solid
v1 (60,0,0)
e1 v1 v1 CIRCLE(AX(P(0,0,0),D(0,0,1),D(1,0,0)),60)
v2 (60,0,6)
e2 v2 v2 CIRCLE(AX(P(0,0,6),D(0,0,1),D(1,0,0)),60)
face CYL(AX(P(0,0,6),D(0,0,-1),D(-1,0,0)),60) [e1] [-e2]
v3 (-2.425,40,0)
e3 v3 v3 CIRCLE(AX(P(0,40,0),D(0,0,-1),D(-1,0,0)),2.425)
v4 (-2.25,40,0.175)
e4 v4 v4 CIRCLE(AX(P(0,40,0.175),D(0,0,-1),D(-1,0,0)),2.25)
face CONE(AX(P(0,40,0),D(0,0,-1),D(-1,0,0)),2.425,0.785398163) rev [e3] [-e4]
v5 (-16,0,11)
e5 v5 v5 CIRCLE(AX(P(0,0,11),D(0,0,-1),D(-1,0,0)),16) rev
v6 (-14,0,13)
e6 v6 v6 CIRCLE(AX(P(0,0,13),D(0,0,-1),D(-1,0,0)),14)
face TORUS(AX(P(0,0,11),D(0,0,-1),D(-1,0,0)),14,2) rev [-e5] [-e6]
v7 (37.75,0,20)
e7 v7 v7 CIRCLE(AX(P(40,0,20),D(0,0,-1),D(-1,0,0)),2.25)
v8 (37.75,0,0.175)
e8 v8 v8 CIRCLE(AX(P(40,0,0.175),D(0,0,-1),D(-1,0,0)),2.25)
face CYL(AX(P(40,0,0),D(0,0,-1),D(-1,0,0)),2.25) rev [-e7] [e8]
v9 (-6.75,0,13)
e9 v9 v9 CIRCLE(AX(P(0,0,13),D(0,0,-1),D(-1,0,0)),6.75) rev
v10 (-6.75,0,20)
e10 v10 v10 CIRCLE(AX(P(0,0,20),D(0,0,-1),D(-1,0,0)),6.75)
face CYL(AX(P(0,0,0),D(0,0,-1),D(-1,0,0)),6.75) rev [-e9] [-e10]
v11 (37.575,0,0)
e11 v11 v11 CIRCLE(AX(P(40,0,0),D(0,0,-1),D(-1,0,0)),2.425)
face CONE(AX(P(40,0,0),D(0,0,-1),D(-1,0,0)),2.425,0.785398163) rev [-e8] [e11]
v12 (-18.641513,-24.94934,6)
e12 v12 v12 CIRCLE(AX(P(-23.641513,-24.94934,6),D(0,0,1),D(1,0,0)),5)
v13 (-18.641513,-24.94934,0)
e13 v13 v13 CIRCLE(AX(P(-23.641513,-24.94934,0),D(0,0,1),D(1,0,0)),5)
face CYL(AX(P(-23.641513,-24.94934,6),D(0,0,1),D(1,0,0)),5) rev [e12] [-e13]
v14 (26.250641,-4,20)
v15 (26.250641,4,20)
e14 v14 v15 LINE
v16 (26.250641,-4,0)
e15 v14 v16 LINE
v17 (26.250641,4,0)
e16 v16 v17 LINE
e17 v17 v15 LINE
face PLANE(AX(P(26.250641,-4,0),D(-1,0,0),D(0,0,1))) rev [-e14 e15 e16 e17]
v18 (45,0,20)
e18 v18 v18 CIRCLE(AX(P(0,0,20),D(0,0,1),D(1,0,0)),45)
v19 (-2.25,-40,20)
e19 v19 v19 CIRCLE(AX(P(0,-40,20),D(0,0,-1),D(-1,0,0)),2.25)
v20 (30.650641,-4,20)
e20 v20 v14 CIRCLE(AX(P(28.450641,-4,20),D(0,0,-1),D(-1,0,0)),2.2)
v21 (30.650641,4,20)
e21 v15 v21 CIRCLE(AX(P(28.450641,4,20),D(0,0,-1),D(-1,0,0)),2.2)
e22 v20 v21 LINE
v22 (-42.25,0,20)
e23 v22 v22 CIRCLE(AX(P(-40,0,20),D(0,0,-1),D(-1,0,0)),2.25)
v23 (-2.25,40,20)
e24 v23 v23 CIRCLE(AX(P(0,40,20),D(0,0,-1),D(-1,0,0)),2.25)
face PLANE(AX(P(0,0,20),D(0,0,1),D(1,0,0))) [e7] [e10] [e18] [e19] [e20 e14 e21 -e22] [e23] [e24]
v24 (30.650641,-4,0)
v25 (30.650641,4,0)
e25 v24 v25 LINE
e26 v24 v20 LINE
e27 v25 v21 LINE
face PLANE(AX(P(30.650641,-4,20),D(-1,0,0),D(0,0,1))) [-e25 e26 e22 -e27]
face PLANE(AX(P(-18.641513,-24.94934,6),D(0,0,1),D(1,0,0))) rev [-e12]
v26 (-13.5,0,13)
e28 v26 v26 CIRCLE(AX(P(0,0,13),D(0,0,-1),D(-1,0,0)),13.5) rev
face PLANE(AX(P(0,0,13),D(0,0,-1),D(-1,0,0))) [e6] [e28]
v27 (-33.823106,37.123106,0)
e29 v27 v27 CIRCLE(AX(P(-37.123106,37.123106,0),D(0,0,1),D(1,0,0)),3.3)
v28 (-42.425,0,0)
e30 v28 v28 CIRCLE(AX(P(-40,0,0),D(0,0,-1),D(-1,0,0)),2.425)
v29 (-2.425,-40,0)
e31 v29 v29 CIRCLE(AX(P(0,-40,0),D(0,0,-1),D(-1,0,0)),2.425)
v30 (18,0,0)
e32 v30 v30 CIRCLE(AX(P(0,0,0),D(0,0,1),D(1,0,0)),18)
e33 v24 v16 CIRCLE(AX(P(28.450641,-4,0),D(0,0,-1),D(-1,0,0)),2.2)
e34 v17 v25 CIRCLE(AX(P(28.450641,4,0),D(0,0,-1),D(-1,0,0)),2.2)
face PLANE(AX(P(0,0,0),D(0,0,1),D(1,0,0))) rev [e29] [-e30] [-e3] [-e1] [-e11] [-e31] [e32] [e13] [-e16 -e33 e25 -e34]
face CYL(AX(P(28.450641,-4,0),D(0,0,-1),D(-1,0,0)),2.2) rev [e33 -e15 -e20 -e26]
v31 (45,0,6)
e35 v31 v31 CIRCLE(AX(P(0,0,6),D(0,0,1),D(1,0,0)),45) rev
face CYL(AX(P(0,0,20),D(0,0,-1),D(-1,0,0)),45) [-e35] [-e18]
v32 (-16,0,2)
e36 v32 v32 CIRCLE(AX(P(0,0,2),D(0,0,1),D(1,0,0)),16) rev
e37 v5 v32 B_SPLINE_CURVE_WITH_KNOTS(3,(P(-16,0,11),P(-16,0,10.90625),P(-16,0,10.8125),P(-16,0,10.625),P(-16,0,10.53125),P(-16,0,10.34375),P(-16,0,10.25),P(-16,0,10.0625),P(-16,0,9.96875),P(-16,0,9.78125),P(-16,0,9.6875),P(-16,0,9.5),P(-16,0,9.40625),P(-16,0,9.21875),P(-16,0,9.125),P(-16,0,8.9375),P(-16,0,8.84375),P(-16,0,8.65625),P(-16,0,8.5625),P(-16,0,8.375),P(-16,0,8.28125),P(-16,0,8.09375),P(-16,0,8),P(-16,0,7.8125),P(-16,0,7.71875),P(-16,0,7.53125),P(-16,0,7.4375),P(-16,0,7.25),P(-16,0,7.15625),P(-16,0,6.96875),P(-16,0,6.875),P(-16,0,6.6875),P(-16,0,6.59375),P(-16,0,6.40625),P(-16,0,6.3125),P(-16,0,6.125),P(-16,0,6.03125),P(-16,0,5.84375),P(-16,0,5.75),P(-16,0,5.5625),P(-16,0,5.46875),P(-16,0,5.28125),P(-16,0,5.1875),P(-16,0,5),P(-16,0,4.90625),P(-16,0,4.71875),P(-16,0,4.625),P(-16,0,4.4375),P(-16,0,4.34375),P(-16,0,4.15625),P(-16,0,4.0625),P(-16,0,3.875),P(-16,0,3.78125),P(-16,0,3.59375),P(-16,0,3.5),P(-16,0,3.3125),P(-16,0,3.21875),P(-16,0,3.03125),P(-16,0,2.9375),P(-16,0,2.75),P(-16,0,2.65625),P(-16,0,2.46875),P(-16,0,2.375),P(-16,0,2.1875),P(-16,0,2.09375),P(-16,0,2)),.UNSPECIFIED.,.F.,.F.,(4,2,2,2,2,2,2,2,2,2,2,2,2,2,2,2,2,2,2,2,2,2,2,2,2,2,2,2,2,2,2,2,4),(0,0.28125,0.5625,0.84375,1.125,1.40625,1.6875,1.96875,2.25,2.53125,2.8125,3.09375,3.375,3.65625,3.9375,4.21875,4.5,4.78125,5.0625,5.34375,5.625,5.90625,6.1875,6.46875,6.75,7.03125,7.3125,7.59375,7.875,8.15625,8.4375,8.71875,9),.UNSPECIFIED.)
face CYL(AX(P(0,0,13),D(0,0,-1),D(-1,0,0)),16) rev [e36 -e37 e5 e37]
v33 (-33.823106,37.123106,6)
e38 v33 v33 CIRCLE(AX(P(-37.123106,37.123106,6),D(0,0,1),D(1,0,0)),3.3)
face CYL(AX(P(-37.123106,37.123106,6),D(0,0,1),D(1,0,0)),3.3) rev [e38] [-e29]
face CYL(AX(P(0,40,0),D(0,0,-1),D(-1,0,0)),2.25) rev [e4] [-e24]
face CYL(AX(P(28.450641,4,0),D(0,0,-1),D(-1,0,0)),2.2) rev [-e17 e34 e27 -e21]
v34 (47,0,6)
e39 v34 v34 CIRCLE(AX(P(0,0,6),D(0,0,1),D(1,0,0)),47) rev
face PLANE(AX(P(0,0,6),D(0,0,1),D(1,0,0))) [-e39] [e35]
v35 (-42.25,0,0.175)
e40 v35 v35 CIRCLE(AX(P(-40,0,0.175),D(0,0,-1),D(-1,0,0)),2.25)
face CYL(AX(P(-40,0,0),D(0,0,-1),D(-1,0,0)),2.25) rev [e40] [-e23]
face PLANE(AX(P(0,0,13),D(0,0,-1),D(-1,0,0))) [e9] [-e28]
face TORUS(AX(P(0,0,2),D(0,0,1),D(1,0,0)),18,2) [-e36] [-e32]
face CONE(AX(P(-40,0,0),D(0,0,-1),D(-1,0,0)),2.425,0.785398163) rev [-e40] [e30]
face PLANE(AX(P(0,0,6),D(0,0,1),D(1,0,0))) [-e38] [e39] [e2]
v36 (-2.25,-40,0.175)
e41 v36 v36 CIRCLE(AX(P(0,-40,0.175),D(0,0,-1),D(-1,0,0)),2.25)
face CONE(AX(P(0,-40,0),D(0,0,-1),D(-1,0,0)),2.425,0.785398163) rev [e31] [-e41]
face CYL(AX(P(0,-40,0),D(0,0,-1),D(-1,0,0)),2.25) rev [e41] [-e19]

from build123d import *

# Parameters (mm, degrees)
ESQUISSE1_R                         = 60
CYLINDRE_PRINCIPAL_DEPTH            = 6
BOSSAGE_RV_R                        = 45
LOGEMENT_RV_DEPTH                   = 20
ESQUISSE20_R                        = 7.5
BOSS_EXTRU_2_DEPTH                  = 6
TROUS_AV_D                          = 4.5
TROUS_AV_CSINK_D                    = 4.85
TROUS_AV_CSINK_ANGLE                = 90
DIAM_TRE_DU_PER_AGE_4_4_4_4_2_DEPTH = 20
D_AGEMENT_SM_D                      = 6.6
TROU_RECOVERY_D                     = 13.5
TROU_RECOVERY_CSINK_D               = 13.55
TROU_RECOVERY_CSINK_ANGLE           = 90
ESQUISSE40_R                        = 16
ENL_V_MAT_EXTRU_2_DEPTH             = 13
CONG_9_R                            = 2
ESQUISSE15_W                        = 5
ESQUISSE15_H                        = 6
CONG_10_R                           = 2


# Read off the part's stored shape, not the designer's step: Diamètre du perçage Ø4.4 (4.4)2
with BuildPart() as part:
    # Esquisse1 → Cylindre principal (new body)
    with BuildSketch(Plane.XY):
        Circle(ESQUISSE1_R)
    extrude(amount=CYLINDRE_PRINCIPAL_DEPTH)

    # Bossage RV → Logement RV (add)
    with BuildSketch(Plane.XY):
        Circle(BOSSAGE_RV_R)
    extrude(amount=LOGEMENT_RV_DEPTH)

    # Esquisse20 → Boss.-Extru.2 (add)
    with BuildSketch(Plane.XY):
        with Locations((-37.123106012, 37.123106012)):
            Circle(ESQUISSE20_R)
    extrude(amount=BOSS_EXTRU_2_DEPTH)

    # Trous AV (through all)
    with Locations(Plane(origin=(0, 40, 0), x_dir=(-1, 0, 0), z_dir=(0, 0, -1))):
        with Locations((0, 0), (40, -40), (0, -80), (-40, -40)):
            CounterSinkHole(TROUS_AV_D / 2, TROUS_AV_CSINK_D / 2, counter_sink_angle=TROUS_AV_CSINK_ANGLE)

    # Diamètre du perçage Ø4.4 (4.4)2 outline → Diamètre du perçage Ø4.4 (4.4)2 (cut)
    with BuildSketch(Plane.XY):
        with BuildLine():
            ThreePointArc((30.65064108, 4), (28.45064108, 6.2), (26.25064108, 4))
            Line((26.25064108, 4), (26.25064108, -4))
            ThreePointArc((26.25064108, -4), (28.45064108, -6.2), (30.65064108, -4))
            Line((30.65064108, -4), (30.65064108, 4))
        make_face()
    extrude(amount=DIAM_TRE_DU_PER_AGE_4_4_4_4_2_DEPTH, mode=Mode.SUBTRACT)

    # Déagement SM (through all)
    with Locations(Plane.XY.offset(6)):
        with Locations((-37.123106012, 37.123106012)):
            Hole(D_AGEMENT_SM_D / 2)

    # Trou recovery (through all)
    with Locations(Plane(origin=(0, 0, 0), x_dir=(-1, 0, 0), z_dir=(0, 0, -1))):
        with Locations((0, 0)):
            CounterSinkHole(TROU_RECOVERY_D / 2, TROU_RECOVERY_CSINK_D / 2, counter_sink_angle=TROU_RECOVERY_CSINK_ANGLE)

    # Esquisse40 → Enlèv. mat.-Extru.2 (cut)
    with BuildSketch(Plane(origin=(0, 0, 0), x_dir=(-1, 0, 0), z_dir=(0, 0, -1))):
        Circle(ESQUISSE40_R)
    extrude(amount=-ENL_V_MAT_EXTRU_2_DEPTH, mode=Mode.SUBTRACT)

    # Congé9
    cong_9_edges = [part.edges().sort_by_distance(p)[0] for p in [
        (16, 0, 0),
    ]]
    fillet(cong_9_edges, radius=CONG_9_R)

    # Esquisse15 → Trou caméra (revolve, cut)
    with BuildSketch(Plane(origin=(-23.641512829, -24.949340174, 6), x_dir=(0, -1, 0), z_dir=(1, 0, 0))):
        with Locations((2.5, 3)):
            Rectangle(ESQUISSE15_W, ESQUISSE15_H)
    revolve(axis=Axis((-23.641512829, -24.949340174, 12.35), (0, 0, -1)), mode=Mode.SUBTRACT)

    # Congé10
    cong_10_edges = [part.edges().sort_by_distance(p)[0] for p in [
        (16, 0, 13),
    ]]
    fillet(cong_10_edges, radius=CONG_10_R)


solid = part.part
